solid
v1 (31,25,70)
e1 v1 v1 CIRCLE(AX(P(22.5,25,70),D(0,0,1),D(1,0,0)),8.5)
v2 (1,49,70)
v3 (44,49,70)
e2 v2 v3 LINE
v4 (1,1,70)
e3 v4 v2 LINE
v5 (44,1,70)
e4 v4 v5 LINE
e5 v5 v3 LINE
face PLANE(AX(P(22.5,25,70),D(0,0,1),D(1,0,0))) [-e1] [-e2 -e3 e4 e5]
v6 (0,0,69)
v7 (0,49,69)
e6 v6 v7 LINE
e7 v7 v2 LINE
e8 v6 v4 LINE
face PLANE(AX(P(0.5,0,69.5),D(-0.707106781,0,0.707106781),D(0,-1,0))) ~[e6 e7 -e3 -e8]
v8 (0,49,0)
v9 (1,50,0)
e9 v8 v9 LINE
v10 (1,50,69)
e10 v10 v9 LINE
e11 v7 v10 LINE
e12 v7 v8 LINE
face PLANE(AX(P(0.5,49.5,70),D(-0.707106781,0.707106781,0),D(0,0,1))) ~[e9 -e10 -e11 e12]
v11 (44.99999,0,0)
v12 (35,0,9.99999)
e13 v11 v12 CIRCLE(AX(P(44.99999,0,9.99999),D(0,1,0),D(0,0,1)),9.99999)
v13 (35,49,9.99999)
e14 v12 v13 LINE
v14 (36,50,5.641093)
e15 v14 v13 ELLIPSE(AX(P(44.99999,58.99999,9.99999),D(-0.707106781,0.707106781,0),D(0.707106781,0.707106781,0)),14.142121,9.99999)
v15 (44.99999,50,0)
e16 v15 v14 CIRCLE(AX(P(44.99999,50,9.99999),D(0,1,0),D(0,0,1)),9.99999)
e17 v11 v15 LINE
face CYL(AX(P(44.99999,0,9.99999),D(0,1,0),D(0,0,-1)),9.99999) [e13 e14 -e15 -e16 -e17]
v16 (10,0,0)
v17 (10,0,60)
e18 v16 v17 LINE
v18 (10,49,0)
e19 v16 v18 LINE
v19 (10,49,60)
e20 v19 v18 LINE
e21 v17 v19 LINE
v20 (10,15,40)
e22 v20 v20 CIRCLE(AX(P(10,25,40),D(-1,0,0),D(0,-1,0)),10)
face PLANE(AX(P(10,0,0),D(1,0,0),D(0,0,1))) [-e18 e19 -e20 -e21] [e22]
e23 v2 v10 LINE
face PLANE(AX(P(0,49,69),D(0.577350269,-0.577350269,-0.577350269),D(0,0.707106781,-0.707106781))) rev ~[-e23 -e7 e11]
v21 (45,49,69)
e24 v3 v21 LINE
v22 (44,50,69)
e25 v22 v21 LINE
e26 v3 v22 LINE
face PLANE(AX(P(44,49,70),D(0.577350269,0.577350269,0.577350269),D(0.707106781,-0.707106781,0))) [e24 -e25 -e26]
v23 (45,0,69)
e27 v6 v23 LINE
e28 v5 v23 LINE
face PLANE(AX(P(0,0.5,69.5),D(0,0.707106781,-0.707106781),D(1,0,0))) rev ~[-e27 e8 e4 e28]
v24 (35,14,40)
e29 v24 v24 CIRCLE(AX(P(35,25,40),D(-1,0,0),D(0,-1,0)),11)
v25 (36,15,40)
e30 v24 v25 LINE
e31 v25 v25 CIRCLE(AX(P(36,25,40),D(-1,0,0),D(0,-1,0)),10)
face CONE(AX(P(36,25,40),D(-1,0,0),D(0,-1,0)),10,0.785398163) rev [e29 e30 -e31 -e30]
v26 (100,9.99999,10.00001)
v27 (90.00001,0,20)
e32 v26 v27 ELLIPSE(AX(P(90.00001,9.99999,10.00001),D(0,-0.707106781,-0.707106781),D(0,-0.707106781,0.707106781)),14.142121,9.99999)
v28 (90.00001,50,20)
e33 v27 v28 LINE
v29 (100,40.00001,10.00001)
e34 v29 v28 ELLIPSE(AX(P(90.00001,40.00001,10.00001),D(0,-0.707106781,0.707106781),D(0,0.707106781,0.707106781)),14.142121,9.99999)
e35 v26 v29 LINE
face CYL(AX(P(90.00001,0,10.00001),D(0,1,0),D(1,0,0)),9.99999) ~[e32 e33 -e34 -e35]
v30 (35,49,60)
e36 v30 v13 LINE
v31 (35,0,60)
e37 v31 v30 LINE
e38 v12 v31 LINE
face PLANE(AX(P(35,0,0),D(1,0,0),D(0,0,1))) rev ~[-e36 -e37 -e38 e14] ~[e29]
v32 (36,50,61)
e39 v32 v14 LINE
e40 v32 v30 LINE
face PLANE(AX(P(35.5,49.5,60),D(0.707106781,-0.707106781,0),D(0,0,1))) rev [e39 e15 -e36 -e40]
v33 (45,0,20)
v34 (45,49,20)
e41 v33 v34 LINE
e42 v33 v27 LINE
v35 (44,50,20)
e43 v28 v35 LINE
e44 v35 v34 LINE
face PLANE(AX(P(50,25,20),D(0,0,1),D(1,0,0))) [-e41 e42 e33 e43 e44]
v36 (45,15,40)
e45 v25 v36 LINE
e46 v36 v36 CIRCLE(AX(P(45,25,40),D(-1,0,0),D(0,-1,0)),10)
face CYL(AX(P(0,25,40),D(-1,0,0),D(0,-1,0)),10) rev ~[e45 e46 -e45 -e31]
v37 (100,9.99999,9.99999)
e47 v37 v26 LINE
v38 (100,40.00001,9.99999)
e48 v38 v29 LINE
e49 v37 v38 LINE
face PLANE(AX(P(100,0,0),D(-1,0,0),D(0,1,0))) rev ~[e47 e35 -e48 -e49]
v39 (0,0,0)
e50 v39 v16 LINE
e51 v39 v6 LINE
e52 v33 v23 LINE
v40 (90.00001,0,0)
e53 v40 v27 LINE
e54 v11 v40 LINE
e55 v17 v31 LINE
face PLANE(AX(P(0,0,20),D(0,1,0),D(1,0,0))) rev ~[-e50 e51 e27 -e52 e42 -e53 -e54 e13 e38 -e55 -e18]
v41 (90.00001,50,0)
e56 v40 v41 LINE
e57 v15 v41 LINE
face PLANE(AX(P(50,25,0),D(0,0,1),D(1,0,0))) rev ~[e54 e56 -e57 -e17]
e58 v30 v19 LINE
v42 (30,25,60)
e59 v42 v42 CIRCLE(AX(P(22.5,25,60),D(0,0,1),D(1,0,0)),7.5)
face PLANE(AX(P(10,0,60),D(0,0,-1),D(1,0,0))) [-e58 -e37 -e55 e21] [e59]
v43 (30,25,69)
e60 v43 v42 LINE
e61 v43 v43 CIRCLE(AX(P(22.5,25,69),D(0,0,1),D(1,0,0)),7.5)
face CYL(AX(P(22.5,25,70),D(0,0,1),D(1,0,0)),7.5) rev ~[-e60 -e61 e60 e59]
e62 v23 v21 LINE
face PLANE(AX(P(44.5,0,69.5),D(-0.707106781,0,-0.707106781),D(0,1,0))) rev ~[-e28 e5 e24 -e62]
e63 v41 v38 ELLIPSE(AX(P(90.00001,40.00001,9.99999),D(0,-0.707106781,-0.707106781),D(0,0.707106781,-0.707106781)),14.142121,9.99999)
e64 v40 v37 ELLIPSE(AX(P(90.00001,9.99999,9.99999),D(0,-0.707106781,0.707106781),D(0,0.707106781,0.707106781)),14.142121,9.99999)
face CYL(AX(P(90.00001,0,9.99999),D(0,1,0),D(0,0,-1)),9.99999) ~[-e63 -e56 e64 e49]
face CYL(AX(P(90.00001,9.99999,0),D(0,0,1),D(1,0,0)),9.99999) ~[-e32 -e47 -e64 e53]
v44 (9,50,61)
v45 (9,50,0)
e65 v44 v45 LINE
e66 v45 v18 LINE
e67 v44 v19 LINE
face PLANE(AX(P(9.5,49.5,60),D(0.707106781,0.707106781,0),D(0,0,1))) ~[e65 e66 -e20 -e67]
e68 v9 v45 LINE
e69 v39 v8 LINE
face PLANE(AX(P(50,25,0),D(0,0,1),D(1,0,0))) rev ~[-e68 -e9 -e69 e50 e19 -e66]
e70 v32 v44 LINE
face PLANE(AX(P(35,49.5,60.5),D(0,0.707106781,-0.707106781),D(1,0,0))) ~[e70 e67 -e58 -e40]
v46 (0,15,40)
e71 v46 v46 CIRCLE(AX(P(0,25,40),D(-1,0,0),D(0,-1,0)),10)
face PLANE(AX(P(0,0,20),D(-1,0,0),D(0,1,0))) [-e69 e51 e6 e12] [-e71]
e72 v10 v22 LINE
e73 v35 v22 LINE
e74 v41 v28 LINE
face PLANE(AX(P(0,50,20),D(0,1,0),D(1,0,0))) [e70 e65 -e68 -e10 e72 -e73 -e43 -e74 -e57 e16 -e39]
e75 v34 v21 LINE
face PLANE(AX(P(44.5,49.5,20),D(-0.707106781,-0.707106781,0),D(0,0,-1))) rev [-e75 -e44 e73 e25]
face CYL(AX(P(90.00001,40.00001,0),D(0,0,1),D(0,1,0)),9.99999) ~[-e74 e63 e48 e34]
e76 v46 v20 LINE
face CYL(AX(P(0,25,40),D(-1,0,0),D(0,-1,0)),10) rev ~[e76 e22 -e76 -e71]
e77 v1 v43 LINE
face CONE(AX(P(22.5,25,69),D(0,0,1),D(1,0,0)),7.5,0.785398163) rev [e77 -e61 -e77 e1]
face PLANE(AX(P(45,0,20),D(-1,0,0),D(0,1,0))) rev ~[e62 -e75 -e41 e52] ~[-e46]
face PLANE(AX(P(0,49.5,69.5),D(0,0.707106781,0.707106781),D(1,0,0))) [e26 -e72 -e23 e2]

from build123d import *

# Parameters (mm, degrees)
F0_W     = 100
F0_H     = 50
F1_DEPTH = 20
F2_W     = 45
F2_H     = 50
F3_DEPTH = 50
F4_W     = 25
F4_H     = 60
F5_DEPTH = 50.001
F6_R     = 10
F7_DEPTH = 45
F8_R     = 7.5
F9_DEPTH = 70.001
F10_SIZE = 1
F11_R    = 9.99999


# Not quite as in the source:
# - a fillet or chamfer is up to 0.001 mm smaller than in the source, because OpenCascade refuses the exact size


with BuildPart() as f1:
    # F0 (on Top) → F1 (new body)
    with BuildSketch(Plane.XY):
        with Locations((50, 25)):
            Rectangle(F0_W, F0_H)
    extrude(amount=F1_DEPTH)

    # F2 (on face) → F3 (join)
    with BuildSketch(Plane.XY.offset(20)):
        with Locations((22.5, 25)):
            Rectangle(F2_W, F2_H)
    extrude(amount=F3_DEPTH)

    # F4 (on face) → F5 (cut, through all)
    with BuildSketch(Plane.XZ):
        with Locations((22.5, 30)):
            Rectangle(F4_W, F4_H)
    extrude(amount=-F5_DEPTH, mode=Mode.SUBTRACT)

    # F6 (on face) → F7 (cut, through all)
    with BuildSketch(Plane(origin=(0, 0, 0), x_dir=(0, -1, 0), z_dir=(-1, 0, 0))):
        with Locations((-25, 40)):
            Circle(F6_R)
    extrude(amount=-F7_DEPTH, mode=Mode.SUBTRACT)

    # F8 (on face) → F9 (cut, through all)
    with BuildSketch(Plane.XY.offset(70)):
        with Locations((22.5, 25)):
            Circle(F8_R)
    extrude(amount=-F9_DEPTH, mode=Mode.SUBTRACT)

    # F10
    f10_edges = [f1.edges().sort_by_distance(p)[0] for p in [
        (45, 50, 45),
        (22.5, 50, 70),
        (45, 25, 70),
        (0, 25, 70),
        (0, 50, 35),
        (10, 50, 30),
        (22.5, 50, 60),
        (35, 50, 30),
        (35, 35, 40),
        (15, 25, 70),
        (22.5, 0, 70),
    ]]
    chamfer(f10_edges, length=F10_SIZE)

    # F11 (radius 10 in the source; OpenCascade refuses exactly that, so slightly less here)
    f11_edges = [f1.edges().sort_by_distance(p)[0] for p in [
        (35, 24.5, 0),
        (100, 25, 0),
        (100, 0, 10),
        (100, 25, 20),
        (100, 50, 10),
    ]]
    fillet(f11_edges, radius=F11_R)


solid = f1.part
